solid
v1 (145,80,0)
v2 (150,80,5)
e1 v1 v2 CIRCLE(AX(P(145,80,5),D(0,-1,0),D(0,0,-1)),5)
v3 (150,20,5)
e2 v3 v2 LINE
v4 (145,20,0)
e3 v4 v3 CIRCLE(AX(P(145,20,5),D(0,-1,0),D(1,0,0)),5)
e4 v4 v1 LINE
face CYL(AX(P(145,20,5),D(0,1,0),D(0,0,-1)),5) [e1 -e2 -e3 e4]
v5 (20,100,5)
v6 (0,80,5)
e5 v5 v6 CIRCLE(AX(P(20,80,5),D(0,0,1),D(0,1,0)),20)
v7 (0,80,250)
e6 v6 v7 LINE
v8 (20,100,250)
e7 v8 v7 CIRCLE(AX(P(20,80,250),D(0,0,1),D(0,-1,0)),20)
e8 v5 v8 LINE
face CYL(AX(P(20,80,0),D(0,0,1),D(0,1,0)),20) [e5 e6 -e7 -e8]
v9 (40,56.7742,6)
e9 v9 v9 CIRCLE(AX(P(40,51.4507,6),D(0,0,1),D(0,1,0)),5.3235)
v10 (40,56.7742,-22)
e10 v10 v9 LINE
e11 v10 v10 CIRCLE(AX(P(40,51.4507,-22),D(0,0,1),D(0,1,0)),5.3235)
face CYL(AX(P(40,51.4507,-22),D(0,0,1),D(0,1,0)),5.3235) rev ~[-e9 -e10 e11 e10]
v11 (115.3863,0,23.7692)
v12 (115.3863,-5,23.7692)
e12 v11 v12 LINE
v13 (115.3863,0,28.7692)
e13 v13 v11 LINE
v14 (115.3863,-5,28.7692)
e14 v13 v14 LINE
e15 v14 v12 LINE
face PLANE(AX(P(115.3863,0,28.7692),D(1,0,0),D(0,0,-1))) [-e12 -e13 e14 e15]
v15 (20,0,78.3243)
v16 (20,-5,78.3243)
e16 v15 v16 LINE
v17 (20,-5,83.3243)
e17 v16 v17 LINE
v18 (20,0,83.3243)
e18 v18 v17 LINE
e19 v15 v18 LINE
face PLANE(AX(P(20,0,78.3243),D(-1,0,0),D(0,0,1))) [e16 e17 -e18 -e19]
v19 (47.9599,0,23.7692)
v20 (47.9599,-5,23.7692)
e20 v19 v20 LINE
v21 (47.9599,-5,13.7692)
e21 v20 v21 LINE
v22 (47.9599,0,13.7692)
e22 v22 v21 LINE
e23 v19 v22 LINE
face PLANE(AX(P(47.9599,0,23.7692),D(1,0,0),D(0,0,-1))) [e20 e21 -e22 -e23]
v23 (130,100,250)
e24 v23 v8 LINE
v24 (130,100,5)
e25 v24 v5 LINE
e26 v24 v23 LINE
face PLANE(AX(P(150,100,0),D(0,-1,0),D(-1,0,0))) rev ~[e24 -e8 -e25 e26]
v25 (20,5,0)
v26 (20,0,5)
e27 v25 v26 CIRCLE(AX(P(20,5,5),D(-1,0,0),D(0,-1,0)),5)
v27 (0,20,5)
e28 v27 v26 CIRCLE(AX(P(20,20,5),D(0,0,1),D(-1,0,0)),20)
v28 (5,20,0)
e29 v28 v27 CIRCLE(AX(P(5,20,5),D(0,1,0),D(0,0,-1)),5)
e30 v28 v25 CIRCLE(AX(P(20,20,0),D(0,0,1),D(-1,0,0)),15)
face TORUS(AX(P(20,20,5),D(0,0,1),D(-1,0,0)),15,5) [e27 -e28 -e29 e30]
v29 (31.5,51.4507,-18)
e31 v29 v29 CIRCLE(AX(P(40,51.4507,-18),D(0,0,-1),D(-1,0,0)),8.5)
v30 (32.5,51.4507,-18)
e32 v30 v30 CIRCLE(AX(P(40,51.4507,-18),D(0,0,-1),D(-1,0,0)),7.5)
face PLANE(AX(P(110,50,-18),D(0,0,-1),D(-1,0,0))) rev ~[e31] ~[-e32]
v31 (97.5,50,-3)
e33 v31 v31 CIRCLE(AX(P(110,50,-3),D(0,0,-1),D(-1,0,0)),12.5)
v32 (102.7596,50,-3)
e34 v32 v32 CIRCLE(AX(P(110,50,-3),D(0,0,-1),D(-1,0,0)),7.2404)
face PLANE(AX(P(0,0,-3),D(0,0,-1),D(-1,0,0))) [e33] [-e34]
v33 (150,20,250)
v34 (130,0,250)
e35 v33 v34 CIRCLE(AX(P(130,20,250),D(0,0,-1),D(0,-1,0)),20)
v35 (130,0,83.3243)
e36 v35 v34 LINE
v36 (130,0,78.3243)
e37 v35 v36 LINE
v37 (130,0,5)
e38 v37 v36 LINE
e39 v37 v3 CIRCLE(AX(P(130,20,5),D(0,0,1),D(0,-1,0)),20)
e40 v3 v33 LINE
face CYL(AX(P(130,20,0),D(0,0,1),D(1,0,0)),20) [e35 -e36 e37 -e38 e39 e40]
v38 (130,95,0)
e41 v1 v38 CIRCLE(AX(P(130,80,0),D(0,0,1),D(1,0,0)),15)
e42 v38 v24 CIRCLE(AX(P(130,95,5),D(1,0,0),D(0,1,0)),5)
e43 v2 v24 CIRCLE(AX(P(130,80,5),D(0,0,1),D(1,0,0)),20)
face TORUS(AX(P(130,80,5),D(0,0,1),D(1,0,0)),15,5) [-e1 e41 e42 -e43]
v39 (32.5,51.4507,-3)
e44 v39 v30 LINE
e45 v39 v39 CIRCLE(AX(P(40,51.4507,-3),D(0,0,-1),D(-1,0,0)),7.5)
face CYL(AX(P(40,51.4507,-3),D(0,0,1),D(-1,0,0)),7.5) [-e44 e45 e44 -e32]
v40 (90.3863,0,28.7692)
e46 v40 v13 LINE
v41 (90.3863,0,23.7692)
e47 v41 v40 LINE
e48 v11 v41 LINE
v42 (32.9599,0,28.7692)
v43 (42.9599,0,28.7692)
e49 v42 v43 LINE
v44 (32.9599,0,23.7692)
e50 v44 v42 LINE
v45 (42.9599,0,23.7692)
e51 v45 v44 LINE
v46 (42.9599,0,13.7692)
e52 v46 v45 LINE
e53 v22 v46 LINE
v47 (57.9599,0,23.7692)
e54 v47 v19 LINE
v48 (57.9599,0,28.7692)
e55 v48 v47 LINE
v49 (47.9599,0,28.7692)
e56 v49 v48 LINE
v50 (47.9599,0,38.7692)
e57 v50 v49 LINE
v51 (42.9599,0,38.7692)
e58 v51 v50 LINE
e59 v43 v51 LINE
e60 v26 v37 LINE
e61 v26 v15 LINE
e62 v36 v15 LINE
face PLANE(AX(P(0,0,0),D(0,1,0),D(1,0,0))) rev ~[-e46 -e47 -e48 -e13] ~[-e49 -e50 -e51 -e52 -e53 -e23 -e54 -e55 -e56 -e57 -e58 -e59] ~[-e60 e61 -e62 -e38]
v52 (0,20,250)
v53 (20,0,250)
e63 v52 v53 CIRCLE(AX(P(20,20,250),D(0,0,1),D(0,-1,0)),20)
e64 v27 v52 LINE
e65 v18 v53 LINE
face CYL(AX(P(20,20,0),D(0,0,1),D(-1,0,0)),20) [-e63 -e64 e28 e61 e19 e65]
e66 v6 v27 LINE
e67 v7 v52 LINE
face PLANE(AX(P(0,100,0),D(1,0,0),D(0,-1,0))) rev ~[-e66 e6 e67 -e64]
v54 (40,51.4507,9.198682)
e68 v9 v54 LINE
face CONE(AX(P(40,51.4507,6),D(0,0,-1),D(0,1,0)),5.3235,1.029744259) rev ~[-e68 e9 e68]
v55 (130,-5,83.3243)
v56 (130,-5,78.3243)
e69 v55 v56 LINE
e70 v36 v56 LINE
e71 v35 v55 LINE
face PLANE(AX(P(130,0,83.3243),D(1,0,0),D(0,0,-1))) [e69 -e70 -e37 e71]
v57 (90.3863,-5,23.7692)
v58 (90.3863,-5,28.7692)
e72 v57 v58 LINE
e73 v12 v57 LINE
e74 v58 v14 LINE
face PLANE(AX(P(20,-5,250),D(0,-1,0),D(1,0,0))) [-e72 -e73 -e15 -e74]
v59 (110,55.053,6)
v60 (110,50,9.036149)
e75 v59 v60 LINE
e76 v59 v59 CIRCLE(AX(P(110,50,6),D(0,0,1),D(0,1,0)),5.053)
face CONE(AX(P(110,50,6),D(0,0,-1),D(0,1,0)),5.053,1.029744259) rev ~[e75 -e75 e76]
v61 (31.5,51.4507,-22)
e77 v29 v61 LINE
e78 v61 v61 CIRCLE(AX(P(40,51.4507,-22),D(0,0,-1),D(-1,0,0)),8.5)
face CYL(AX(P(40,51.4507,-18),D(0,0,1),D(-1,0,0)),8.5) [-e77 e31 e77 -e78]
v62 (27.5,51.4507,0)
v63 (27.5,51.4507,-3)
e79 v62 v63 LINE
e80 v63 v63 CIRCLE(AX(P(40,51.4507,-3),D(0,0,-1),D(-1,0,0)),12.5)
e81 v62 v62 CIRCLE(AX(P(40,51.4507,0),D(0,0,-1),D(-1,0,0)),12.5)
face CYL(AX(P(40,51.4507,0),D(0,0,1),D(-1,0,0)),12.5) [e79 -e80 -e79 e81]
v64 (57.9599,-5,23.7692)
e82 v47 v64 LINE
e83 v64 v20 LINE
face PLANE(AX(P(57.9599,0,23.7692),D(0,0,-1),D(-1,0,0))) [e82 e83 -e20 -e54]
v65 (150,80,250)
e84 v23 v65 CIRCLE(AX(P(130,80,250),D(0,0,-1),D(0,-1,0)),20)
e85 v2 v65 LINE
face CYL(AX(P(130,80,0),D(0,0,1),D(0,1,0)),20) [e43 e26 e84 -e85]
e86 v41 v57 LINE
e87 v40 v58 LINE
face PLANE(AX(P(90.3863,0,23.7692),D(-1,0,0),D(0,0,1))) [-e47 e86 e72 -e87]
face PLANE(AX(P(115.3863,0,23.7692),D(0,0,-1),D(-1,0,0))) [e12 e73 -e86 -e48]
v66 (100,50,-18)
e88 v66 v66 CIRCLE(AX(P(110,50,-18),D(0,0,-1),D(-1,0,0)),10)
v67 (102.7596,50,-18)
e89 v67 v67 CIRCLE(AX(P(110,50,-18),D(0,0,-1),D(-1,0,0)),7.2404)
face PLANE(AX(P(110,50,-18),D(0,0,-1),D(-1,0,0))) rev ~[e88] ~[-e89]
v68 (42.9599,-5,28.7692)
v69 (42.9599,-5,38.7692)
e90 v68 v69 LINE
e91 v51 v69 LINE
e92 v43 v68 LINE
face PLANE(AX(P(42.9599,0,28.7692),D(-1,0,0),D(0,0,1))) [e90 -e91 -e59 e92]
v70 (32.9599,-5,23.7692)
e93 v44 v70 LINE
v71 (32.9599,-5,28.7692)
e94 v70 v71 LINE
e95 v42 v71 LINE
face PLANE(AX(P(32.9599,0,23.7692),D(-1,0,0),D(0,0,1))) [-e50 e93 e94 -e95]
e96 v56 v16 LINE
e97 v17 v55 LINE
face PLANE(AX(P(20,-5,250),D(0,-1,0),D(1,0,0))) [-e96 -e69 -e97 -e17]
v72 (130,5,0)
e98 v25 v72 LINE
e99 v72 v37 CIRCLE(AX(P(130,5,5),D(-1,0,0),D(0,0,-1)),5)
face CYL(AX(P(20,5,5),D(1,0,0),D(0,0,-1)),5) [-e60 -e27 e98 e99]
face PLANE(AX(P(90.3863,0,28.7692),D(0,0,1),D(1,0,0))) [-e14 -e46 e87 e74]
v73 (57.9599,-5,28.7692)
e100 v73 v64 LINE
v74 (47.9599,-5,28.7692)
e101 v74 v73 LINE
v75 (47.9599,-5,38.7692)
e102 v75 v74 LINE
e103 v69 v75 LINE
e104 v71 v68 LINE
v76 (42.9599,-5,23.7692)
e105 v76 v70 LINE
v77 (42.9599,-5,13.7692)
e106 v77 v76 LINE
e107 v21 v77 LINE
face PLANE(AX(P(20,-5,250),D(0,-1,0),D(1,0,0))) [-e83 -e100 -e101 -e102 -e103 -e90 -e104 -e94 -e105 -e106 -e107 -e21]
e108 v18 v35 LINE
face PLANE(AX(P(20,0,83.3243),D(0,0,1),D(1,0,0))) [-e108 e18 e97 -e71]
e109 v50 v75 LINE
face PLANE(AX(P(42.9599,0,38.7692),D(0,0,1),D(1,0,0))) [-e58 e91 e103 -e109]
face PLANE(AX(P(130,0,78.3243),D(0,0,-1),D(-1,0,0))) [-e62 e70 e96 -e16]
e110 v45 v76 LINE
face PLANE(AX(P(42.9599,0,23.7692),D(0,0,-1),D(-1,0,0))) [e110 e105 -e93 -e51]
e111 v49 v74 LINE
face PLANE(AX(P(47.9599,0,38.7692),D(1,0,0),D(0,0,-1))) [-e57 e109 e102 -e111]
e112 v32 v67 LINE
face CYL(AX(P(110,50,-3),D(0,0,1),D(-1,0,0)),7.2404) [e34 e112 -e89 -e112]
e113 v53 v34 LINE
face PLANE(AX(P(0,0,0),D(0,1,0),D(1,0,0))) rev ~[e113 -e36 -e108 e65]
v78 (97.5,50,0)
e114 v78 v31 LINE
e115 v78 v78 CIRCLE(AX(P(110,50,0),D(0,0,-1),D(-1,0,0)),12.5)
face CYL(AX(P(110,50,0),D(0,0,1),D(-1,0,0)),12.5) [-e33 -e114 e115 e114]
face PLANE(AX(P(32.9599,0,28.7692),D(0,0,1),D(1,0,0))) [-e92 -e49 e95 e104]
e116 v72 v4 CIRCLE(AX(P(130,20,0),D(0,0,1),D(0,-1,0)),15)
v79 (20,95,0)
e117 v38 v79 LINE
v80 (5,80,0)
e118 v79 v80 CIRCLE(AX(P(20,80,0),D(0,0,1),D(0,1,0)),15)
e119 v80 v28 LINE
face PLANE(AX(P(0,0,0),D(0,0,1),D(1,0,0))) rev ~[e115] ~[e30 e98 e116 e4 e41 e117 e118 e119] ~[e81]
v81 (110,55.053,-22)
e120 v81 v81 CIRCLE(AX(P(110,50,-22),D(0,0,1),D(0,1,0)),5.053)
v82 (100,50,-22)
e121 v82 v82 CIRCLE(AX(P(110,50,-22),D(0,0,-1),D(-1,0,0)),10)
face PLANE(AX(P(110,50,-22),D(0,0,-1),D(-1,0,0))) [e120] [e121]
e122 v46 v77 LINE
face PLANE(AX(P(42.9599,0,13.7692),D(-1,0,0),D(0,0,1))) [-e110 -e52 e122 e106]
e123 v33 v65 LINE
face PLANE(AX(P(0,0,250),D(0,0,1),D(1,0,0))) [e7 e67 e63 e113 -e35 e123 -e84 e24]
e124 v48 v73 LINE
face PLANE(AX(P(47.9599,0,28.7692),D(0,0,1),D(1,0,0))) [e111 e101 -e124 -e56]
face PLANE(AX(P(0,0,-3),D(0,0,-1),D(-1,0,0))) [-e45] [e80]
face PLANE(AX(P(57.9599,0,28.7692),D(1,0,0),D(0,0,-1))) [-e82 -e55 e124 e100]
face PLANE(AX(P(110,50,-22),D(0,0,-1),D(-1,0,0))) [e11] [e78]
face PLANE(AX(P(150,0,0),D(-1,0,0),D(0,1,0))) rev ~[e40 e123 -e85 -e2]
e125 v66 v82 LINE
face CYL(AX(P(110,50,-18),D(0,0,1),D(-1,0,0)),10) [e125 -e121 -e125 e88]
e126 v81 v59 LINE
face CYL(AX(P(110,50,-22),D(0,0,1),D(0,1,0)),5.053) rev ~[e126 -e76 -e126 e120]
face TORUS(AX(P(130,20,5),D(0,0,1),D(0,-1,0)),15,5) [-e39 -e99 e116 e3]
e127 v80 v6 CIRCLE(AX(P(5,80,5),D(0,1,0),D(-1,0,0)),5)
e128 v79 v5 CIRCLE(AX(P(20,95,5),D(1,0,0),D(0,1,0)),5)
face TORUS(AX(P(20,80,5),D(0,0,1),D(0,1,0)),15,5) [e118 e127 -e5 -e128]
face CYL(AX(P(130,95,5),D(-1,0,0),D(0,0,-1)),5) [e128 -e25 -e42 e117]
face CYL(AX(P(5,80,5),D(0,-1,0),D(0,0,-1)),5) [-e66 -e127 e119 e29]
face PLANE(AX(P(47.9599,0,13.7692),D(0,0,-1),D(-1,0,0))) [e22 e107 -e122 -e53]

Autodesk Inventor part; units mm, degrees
ref_plane "YZ Plane" through (0, 0, 0) normal (1, 0, 0) x (0, 1, 0)
ref_plane "XZ Plane" through (0, 0, 0) normal (0, 1, 0) x (-1, 0, 0)
ref_plane "XY Plane" through (0, 0, 0) normal (0, 0, 1) x (1, 0, 0)
sketch "Sketch1" plane through (0, 0, 0) normal (0, 0, 1) x (1, 0, 0)
  line L0 (0, 0) -> (150, 0)
  line L1 (150, 0) -> (150, 100)
  line L2 (150, 100) -> (0, 100)
  line L3 (0, 100) -> (0, 0)
  dimension "d0" = 150
  dimension "d1" = 100
extrude "Extrusion1" add sketch "Sketch1" along normal blind 250
fillet "Fillet1" radius 20 1 edges at (150, 100, 125)
fillet "Fillet2" radius 20 1 edges at (150, 0, 125)
fillet "Fillet3" radius 20 1 edges at (0, 100, 125)
fillet "Fillet4" radius 20 1 edges at (0, 0, 125)
fillet "Fillet5" radius 5 8 edges at (5.8579, 94.1421, 0) (0, 50, 0) (5.8579, 5.8579, 0) (75, 0, 0) (144.1421, 5.8579, 0) (150, 50, 0) (144.1421, 94.1421, 0) (75, 100, 0)
sketch "Sketch2" plane through (20, 0, 250) normal (0, -1, 0) x (1, 0, 0)
  line L0 (110, 0) -> (110, -245) projected
  line L1 (0, -245) -> (0, 0) projected
  line L2 (110, -171.6757) -> (0, -171.6757)
  line L3 (0, -171.6757) -> (0, -166.6757)
  line L4 (0, -166.6757) -> (110, -166.6757)
  line L5 (110, -166.6757) -> (110, -171.6757)
  line L6 (95.3863, -226.2308) -> (70.3863, -226.2308)
  line L7 (70.3863, -226.2308) -> (70.3863, -221.2308)
  line L8 (70.3863, -221.2308) -> (95.3863, -221.2308)
  line L9 (95.3863, -221.2308) -> (95.3863, -226.2308)
  line L10 (37.9599, -226.2308) -> (12.9599, -226.2308)
  line L11 (12.9599, -226.2308) -> (12.9599, -221.2308)
  line L12 (12.9599, -221.2308) -> (37.9599, -221.2308)
  line L13 (37.9599, -221.2308) -> (37.9599, -226.2308)
  line L14 (27.9599, -236.2308) -> (22.9599, -236.2308)
  line L15 (22.9599, -236.2308) -> (22.9599, -211.2308)
  line L16 (22.9599, -211.2308) -> (27.9599, -211.2308)
  line L17 (27.9599, -211.2308) -> (27.9599, -236.2308)
  point P0 (-20, -250)
  point P1 (27.9599, -226.2308)
  point P2 (27.9599, -221.2308)
  point P3 (22.9599, -221.2308)
  point P4 (22.9599, -226.2308)
  dimension "d9" = 25
  dimension "d10" = 5
  dimension "d11" = 5
  dimension "d12" = 25
  dimension "d13" = 10
  dimension "d14" = 10
  dimension "d15" = 5
  dimension "d16" = 25
  dimension "d17" = 5
extrude "Extrusion2" add sketch "Sketch2" along normal blind 5
sketch "Sketch3" plane through (0, 0, 0) normal (0, 0, -1) x (-1, 0, 0)
  line L0 (-20, 100) -> (-130, 100) projected
  line L1 (-150, 80) -> (-150, 20) projected
  circle A0 centre (-110, 50) radius 12.5
  circle A1 centre (-40, 51.4507) radius 12.5
  point P0 (0, 0)
  point P1 (-150, 50)
  dimension "d20" = 50
  dimension "d21" = 40
  dimension "d22" = 70
  dimension "d23" = 25
  dimension "d24" = 25
extrude "Extrusion3" add sketch "Sketch3" along normal blind 3
sketch "Sketch4" plane through (110, 50, -3) normal (0, 0, -1) x (-1, 0, 0)
  circle A0 centre (0, 0) radius 7.2404
  circle A1 centre (70, 1.4507) radius 12.5 projected
  circle A2 centre (70, 1.4507) radius 7.5
  point P0 (110, -50)
  dimension "d27" = 15
extrude "Extrusion4" add sketch "Sketch4" along normal blind 15 contours A0 | A2
sketch "Sketch5" plane through (110, 50, -18) normal (0, 0, -1) x (-1, 0, 0)
  circle A0 centre (0, 0) radius 7.2404 projected
  circle A1 centre (0, 0) radius 10
  circle A2 centre (70, 1.4507) radius 7.5 projected
  circle A3 centre (70, 1.4507) radius 8.5
  point P0 (110, -50)
  dimension "d30" = 20
  dimension "d31" = 17
extrude "Extrusion5" add sketch "Sketch5" along normal blind 4 contours A0 | A1 | A2 | A3
sketch "Sketch6" plane through (110, 50, -22) normal (0, 0, -1) x (-1, 0, 0)
  circle A0 centre (0, 0) radius 10 projected
  point P0 (110, -50)
hole "Hole1" at (110, 50, -22) direction (0, 0, 1) diameter 10.106 depth 28 tip angle 118 thread size "M12x1.75" class "6H" standard "ISO Metric profile"
sketch "Sketch7" plane through (40, 51.4507, -22) normal (0, 0, -1) x (-1, 0, 0)
  circle A0 centre (0, 0) radius 8.5 projected
  point P0 (40, -51.4507)
hole "Hole2" at (40, 51.4507, -22) direction (0, 0, 1) diameter 10.647 depth 28 tip angle 118 thread size "M12x1.25" class "6H" standard "ISO Metric profile"
properties part number "battery eg 26"
